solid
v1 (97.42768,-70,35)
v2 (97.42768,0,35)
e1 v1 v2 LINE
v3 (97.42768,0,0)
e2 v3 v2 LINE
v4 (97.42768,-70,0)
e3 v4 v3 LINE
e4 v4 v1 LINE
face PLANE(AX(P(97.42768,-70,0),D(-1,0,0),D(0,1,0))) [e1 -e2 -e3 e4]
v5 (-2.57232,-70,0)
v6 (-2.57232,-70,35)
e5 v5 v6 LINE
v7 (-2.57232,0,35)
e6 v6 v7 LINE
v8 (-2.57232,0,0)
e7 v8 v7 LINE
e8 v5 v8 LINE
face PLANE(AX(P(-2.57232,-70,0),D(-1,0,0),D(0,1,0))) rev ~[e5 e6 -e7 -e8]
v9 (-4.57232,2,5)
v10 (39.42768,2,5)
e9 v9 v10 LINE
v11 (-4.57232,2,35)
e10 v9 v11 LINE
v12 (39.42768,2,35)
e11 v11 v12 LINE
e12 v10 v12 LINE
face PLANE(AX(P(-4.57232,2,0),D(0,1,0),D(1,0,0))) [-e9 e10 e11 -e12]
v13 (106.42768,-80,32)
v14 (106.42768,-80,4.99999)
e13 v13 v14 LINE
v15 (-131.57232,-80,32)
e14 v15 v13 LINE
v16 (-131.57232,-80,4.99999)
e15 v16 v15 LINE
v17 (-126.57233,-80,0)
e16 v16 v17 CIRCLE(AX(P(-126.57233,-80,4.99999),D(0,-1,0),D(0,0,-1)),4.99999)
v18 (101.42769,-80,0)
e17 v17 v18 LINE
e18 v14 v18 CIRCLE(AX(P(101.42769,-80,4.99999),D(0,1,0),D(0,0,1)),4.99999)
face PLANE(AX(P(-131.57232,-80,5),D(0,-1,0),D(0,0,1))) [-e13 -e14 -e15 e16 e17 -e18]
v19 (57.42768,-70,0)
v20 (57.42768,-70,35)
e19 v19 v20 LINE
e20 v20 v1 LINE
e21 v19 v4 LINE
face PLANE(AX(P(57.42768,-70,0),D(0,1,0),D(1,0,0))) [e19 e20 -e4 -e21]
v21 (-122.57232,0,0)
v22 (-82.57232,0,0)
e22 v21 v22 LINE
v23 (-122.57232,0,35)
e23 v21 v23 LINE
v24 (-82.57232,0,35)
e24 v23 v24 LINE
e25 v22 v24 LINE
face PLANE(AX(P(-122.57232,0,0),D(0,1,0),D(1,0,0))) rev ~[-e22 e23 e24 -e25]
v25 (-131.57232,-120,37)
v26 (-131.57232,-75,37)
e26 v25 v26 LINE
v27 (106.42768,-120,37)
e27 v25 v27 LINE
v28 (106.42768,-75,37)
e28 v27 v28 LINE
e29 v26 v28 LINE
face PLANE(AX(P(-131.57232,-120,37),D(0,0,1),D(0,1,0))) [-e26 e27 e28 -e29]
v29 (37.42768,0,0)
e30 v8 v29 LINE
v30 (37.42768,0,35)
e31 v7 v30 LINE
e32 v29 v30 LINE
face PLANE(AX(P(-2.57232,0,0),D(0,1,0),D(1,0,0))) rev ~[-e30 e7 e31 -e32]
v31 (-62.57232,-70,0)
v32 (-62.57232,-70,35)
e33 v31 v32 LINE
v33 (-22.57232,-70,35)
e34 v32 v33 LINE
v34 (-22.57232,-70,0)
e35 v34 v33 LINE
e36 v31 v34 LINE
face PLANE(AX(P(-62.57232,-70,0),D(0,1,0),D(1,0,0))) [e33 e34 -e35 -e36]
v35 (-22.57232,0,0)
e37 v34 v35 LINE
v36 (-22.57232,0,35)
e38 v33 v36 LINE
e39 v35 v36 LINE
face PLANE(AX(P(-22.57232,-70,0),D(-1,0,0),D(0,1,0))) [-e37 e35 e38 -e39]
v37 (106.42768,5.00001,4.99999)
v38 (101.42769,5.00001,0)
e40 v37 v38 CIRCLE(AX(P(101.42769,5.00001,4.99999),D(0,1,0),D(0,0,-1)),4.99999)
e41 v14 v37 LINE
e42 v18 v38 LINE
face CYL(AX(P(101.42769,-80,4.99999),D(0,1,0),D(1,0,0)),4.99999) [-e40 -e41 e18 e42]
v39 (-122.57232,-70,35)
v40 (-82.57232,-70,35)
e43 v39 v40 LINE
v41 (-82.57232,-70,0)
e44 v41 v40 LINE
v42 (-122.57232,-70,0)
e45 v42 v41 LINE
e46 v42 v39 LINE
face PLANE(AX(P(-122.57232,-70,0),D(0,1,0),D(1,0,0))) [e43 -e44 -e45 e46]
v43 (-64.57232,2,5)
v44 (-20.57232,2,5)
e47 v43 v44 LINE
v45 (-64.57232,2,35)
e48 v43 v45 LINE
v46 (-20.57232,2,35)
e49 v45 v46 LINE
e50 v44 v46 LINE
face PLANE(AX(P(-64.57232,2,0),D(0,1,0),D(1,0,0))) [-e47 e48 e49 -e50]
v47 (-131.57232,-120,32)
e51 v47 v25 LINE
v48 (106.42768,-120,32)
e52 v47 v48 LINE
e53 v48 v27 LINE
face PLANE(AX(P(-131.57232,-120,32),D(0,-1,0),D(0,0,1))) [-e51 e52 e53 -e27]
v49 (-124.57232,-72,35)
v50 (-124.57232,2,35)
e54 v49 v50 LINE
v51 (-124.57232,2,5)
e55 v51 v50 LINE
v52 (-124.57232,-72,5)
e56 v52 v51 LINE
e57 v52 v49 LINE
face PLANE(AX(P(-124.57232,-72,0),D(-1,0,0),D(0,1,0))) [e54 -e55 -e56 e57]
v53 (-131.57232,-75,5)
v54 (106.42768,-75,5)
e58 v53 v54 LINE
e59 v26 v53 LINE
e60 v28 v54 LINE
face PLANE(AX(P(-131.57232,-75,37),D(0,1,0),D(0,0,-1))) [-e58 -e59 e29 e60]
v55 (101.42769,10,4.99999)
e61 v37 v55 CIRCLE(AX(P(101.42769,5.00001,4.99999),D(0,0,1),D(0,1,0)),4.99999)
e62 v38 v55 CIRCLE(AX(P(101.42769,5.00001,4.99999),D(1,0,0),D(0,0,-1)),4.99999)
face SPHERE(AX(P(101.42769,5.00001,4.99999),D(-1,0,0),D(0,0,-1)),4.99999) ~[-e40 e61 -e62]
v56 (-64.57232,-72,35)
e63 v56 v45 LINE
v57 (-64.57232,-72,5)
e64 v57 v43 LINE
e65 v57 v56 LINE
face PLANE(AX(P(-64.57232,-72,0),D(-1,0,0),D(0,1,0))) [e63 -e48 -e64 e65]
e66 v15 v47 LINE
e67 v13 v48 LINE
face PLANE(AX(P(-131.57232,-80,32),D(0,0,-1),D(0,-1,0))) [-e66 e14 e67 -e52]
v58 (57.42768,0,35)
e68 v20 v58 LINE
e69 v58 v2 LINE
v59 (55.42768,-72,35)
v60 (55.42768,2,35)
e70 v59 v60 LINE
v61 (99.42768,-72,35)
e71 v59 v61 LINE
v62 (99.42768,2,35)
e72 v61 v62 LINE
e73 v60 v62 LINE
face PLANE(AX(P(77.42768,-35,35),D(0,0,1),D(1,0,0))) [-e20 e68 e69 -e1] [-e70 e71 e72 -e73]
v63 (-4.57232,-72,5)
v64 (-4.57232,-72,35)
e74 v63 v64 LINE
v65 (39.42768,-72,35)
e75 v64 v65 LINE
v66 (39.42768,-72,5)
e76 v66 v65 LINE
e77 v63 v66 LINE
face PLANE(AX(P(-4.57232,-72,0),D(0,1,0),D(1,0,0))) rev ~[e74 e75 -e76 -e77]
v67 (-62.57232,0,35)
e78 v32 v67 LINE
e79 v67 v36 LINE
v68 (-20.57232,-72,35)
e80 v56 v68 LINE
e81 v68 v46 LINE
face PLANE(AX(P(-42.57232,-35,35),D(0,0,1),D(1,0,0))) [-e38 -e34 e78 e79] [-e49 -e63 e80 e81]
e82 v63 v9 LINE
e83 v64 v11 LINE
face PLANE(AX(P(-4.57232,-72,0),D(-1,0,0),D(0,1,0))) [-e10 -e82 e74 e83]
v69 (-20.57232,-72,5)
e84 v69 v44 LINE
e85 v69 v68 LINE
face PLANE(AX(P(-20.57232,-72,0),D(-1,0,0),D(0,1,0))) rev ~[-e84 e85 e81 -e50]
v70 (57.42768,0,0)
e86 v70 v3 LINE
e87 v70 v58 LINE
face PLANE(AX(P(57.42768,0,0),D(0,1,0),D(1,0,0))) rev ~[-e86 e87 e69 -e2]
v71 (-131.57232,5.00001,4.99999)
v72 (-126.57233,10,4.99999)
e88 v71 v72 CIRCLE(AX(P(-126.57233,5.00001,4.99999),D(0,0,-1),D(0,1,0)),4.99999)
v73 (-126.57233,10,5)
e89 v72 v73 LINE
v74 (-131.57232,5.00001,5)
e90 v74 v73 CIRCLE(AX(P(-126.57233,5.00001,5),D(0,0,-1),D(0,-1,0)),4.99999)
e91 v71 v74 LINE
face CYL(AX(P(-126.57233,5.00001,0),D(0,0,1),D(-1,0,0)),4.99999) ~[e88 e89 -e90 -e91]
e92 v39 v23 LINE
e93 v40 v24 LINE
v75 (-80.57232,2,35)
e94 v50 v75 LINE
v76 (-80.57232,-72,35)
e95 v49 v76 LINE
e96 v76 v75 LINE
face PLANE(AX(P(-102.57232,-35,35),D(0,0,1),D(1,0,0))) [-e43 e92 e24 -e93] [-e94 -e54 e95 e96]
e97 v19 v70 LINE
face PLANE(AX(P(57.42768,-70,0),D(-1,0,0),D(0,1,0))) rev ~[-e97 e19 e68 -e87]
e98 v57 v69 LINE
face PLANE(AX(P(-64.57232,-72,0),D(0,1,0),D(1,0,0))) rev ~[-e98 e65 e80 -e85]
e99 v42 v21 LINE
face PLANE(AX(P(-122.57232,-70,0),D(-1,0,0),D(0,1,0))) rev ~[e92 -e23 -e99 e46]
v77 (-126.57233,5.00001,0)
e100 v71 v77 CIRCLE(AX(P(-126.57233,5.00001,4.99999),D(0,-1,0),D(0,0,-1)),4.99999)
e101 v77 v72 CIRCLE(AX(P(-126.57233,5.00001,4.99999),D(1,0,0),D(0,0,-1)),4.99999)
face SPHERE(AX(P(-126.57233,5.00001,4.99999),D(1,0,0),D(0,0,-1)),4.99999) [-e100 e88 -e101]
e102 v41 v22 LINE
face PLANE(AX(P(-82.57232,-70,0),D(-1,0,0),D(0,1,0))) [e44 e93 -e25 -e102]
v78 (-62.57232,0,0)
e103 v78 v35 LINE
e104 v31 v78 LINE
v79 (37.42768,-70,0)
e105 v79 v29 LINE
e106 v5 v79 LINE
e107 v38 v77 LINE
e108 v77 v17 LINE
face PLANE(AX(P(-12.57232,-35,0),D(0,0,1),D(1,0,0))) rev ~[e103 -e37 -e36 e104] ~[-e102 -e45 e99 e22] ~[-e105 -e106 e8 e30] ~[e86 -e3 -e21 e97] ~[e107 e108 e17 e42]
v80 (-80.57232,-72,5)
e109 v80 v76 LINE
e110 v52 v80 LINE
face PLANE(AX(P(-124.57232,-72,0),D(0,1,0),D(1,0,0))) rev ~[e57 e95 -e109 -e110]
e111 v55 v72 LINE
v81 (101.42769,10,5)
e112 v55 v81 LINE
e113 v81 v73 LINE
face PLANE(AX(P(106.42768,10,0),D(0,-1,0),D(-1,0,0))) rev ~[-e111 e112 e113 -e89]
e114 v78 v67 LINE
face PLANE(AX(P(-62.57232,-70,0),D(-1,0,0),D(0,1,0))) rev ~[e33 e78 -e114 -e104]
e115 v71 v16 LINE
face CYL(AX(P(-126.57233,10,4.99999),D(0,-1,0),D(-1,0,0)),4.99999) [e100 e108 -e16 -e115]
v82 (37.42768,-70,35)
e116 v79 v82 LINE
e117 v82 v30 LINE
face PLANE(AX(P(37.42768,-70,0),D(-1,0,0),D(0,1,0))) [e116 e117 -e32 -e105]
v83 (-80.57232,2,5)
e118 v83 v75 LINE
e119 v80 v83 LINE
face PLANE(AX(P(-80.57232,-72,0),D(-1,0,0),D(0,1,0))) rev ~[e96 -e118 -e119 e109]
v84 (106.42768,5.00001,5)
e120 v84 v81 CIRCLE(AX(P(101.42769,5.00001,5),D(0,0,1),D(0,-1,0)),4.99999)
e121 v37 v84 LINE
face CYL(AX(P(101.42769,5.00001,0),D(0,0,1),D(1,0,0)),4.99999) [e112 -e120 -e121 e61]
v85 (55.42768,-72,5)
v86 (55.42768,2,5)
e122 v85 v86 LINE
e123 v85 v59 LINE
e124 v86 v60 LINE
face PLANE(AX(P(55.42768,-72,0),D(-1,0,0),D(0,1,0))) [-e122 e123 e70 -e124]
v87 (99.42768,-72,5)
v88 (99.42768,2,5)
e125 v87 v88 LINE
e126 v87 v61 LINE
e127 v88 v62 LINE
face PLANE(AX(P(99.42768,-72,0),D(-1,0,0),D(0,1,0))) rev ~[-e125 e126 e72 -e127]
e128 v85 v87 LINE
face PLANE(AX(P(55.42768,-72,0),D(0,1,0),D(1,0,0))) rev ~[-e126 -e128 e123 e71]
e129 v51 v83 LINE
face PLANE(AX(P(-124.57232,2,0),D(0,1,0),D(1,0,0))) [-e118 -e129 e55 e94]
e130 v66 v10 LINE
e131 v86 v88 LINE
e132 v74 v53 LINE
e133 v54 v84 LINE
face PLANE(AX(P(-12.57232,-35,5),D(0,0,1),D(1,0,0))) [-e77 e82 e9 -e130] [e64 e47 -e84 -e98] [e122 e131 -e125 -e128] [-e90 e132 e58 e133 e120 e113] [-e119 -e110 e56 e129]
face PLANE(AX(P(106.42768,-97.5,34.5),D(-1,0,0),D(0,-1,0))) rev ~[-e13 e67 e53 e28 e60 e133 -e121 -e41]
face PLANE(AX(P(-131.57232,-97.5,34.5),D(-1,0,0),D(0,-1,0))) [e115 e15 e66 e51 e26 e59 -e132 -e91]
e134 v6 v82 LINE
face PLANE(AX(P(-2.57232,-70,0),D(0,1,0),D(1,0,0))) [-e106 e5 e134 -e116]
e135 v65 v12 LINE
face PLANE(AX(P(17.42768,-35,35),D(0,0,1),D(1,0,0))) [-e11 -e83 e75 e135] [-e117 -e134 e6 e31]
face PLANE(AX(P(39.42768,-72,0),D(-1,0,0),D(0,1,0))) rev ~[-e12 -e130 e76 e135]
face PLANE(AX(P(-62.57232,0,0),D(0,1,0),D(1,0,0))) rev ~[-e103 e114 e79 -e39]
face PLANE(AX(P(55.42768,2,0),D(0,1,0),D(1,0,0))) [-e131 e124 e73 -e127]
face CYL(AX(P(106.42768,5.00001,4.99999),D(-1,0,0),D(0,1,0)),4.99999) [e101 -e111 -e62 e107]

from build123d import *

# Parameters (mm, degrees)
F0_W     = 44
F0_H     = 74
F1_DEPTH = 5
F2_W     = 5
F2_H     = 27
F3_DEPTH = 238
F0_W_2   = 40
F0_H_2   = 70
F4_DEPTH = 35
F5_R     = 4.99999


# Not quite as in the source:
# - a fillet or chamfer is up to 0.001 mm smaller than in the source, because OpenCascade refuses the exact size


with BuildPart() as f1:
    # F0 (on Top) → F1 (new body)
    with BuildSketch(Plane.XY):
        Polygon((106.4276799491, 10), (-131.5723200509, 10), (-131.5723200509, -80), (-129.5723200509, -80), (106.4276799491, -80), align=None)
        with Locations((-102.5723200509, -35)):
            Rectangle(F0_W, F0_H, mode=Mode.SUBTRACT)
        with Locations((-42.5723200509, -35)):
            Rectangle(F0_W, F0_H, mode=Mode.SUBTRACT)
        with Locations((17.4276799491, -35)):
            Rectangle(F0_W, F0_H, mode=Mode.SUBTRACT)
        with Locations((77.4276799491, -35)):
            Rectangle(F0_W, F0_H, mode=Mode.SUBTRACT)
    extrude(amount=F1_DEPTH)

    # F2 (on face) → F3 (join)
    with BuildSketch(Plane(origin=(-131.5723200509, 0, 0), x_dir=(0, -1, 0), z_dir=(-1, 0, 0))):
        Polygon((120, 32), (120, 37), (75, 37), (75, 32), (80, 32), align=None)
        with Locations((77.5, 18.5)):
            Rectangle(F2_W, F2_H)
    extrude(amount=-F3_DEPTH)

    # F0 (on Top) → F4 (join)
    with BuildSketch(Plane.XY):
        with Locations((-102.5723200509, -35)):
            Rectangle(F0_W, F0_H)
        with Locations((-102.5723200509, -35)):
            Rectangle(F0_W_2, F0_H_2, mode=Mode.SUBTRACT)
        with Locations((-42.5723200509, -35)):
            Rectangle(F0_W, F0_H)
        with Locations((-42.5723200509, -35)):
            Rectangle(F0_W_2, F0_H_2, mode=Mode.SUBTRACT)
        with Locations((17.4276799491, -35)):
            Rectangle(F0_W, F0_H)
        with Locations((17.4276799491, -35)):
            Rectangle(F0_W_2, F0_H_2, mode=Mode.SUBTRACT)
        with Locations((77.4276799491, -35)):
            Rectangle(F0_W, F0_H)
        with Locations((77.4276799491, -35)):
            Rectangle(F0_W_2, F0_H_2, mode=Mode.SUBTRACT)
    extrude(amount=F4_DEPTH)

    # F5 (radius 5 in the source; OpenCascade refuses exactly that, so slightly less here)
    f5_edges = [f1.edges().sort_by_distance(p)[0] for p in [
        (-12.57232, 10, 0),
        (-131.57232, -35, 0),
        (106.42768, -35, 0),
        (106.42768, 10, 2.5),
        (-131.57232, 10, 2.5),
    ]]
    fillet(f5_edges, radius=F5_R)


solid = f1.part
